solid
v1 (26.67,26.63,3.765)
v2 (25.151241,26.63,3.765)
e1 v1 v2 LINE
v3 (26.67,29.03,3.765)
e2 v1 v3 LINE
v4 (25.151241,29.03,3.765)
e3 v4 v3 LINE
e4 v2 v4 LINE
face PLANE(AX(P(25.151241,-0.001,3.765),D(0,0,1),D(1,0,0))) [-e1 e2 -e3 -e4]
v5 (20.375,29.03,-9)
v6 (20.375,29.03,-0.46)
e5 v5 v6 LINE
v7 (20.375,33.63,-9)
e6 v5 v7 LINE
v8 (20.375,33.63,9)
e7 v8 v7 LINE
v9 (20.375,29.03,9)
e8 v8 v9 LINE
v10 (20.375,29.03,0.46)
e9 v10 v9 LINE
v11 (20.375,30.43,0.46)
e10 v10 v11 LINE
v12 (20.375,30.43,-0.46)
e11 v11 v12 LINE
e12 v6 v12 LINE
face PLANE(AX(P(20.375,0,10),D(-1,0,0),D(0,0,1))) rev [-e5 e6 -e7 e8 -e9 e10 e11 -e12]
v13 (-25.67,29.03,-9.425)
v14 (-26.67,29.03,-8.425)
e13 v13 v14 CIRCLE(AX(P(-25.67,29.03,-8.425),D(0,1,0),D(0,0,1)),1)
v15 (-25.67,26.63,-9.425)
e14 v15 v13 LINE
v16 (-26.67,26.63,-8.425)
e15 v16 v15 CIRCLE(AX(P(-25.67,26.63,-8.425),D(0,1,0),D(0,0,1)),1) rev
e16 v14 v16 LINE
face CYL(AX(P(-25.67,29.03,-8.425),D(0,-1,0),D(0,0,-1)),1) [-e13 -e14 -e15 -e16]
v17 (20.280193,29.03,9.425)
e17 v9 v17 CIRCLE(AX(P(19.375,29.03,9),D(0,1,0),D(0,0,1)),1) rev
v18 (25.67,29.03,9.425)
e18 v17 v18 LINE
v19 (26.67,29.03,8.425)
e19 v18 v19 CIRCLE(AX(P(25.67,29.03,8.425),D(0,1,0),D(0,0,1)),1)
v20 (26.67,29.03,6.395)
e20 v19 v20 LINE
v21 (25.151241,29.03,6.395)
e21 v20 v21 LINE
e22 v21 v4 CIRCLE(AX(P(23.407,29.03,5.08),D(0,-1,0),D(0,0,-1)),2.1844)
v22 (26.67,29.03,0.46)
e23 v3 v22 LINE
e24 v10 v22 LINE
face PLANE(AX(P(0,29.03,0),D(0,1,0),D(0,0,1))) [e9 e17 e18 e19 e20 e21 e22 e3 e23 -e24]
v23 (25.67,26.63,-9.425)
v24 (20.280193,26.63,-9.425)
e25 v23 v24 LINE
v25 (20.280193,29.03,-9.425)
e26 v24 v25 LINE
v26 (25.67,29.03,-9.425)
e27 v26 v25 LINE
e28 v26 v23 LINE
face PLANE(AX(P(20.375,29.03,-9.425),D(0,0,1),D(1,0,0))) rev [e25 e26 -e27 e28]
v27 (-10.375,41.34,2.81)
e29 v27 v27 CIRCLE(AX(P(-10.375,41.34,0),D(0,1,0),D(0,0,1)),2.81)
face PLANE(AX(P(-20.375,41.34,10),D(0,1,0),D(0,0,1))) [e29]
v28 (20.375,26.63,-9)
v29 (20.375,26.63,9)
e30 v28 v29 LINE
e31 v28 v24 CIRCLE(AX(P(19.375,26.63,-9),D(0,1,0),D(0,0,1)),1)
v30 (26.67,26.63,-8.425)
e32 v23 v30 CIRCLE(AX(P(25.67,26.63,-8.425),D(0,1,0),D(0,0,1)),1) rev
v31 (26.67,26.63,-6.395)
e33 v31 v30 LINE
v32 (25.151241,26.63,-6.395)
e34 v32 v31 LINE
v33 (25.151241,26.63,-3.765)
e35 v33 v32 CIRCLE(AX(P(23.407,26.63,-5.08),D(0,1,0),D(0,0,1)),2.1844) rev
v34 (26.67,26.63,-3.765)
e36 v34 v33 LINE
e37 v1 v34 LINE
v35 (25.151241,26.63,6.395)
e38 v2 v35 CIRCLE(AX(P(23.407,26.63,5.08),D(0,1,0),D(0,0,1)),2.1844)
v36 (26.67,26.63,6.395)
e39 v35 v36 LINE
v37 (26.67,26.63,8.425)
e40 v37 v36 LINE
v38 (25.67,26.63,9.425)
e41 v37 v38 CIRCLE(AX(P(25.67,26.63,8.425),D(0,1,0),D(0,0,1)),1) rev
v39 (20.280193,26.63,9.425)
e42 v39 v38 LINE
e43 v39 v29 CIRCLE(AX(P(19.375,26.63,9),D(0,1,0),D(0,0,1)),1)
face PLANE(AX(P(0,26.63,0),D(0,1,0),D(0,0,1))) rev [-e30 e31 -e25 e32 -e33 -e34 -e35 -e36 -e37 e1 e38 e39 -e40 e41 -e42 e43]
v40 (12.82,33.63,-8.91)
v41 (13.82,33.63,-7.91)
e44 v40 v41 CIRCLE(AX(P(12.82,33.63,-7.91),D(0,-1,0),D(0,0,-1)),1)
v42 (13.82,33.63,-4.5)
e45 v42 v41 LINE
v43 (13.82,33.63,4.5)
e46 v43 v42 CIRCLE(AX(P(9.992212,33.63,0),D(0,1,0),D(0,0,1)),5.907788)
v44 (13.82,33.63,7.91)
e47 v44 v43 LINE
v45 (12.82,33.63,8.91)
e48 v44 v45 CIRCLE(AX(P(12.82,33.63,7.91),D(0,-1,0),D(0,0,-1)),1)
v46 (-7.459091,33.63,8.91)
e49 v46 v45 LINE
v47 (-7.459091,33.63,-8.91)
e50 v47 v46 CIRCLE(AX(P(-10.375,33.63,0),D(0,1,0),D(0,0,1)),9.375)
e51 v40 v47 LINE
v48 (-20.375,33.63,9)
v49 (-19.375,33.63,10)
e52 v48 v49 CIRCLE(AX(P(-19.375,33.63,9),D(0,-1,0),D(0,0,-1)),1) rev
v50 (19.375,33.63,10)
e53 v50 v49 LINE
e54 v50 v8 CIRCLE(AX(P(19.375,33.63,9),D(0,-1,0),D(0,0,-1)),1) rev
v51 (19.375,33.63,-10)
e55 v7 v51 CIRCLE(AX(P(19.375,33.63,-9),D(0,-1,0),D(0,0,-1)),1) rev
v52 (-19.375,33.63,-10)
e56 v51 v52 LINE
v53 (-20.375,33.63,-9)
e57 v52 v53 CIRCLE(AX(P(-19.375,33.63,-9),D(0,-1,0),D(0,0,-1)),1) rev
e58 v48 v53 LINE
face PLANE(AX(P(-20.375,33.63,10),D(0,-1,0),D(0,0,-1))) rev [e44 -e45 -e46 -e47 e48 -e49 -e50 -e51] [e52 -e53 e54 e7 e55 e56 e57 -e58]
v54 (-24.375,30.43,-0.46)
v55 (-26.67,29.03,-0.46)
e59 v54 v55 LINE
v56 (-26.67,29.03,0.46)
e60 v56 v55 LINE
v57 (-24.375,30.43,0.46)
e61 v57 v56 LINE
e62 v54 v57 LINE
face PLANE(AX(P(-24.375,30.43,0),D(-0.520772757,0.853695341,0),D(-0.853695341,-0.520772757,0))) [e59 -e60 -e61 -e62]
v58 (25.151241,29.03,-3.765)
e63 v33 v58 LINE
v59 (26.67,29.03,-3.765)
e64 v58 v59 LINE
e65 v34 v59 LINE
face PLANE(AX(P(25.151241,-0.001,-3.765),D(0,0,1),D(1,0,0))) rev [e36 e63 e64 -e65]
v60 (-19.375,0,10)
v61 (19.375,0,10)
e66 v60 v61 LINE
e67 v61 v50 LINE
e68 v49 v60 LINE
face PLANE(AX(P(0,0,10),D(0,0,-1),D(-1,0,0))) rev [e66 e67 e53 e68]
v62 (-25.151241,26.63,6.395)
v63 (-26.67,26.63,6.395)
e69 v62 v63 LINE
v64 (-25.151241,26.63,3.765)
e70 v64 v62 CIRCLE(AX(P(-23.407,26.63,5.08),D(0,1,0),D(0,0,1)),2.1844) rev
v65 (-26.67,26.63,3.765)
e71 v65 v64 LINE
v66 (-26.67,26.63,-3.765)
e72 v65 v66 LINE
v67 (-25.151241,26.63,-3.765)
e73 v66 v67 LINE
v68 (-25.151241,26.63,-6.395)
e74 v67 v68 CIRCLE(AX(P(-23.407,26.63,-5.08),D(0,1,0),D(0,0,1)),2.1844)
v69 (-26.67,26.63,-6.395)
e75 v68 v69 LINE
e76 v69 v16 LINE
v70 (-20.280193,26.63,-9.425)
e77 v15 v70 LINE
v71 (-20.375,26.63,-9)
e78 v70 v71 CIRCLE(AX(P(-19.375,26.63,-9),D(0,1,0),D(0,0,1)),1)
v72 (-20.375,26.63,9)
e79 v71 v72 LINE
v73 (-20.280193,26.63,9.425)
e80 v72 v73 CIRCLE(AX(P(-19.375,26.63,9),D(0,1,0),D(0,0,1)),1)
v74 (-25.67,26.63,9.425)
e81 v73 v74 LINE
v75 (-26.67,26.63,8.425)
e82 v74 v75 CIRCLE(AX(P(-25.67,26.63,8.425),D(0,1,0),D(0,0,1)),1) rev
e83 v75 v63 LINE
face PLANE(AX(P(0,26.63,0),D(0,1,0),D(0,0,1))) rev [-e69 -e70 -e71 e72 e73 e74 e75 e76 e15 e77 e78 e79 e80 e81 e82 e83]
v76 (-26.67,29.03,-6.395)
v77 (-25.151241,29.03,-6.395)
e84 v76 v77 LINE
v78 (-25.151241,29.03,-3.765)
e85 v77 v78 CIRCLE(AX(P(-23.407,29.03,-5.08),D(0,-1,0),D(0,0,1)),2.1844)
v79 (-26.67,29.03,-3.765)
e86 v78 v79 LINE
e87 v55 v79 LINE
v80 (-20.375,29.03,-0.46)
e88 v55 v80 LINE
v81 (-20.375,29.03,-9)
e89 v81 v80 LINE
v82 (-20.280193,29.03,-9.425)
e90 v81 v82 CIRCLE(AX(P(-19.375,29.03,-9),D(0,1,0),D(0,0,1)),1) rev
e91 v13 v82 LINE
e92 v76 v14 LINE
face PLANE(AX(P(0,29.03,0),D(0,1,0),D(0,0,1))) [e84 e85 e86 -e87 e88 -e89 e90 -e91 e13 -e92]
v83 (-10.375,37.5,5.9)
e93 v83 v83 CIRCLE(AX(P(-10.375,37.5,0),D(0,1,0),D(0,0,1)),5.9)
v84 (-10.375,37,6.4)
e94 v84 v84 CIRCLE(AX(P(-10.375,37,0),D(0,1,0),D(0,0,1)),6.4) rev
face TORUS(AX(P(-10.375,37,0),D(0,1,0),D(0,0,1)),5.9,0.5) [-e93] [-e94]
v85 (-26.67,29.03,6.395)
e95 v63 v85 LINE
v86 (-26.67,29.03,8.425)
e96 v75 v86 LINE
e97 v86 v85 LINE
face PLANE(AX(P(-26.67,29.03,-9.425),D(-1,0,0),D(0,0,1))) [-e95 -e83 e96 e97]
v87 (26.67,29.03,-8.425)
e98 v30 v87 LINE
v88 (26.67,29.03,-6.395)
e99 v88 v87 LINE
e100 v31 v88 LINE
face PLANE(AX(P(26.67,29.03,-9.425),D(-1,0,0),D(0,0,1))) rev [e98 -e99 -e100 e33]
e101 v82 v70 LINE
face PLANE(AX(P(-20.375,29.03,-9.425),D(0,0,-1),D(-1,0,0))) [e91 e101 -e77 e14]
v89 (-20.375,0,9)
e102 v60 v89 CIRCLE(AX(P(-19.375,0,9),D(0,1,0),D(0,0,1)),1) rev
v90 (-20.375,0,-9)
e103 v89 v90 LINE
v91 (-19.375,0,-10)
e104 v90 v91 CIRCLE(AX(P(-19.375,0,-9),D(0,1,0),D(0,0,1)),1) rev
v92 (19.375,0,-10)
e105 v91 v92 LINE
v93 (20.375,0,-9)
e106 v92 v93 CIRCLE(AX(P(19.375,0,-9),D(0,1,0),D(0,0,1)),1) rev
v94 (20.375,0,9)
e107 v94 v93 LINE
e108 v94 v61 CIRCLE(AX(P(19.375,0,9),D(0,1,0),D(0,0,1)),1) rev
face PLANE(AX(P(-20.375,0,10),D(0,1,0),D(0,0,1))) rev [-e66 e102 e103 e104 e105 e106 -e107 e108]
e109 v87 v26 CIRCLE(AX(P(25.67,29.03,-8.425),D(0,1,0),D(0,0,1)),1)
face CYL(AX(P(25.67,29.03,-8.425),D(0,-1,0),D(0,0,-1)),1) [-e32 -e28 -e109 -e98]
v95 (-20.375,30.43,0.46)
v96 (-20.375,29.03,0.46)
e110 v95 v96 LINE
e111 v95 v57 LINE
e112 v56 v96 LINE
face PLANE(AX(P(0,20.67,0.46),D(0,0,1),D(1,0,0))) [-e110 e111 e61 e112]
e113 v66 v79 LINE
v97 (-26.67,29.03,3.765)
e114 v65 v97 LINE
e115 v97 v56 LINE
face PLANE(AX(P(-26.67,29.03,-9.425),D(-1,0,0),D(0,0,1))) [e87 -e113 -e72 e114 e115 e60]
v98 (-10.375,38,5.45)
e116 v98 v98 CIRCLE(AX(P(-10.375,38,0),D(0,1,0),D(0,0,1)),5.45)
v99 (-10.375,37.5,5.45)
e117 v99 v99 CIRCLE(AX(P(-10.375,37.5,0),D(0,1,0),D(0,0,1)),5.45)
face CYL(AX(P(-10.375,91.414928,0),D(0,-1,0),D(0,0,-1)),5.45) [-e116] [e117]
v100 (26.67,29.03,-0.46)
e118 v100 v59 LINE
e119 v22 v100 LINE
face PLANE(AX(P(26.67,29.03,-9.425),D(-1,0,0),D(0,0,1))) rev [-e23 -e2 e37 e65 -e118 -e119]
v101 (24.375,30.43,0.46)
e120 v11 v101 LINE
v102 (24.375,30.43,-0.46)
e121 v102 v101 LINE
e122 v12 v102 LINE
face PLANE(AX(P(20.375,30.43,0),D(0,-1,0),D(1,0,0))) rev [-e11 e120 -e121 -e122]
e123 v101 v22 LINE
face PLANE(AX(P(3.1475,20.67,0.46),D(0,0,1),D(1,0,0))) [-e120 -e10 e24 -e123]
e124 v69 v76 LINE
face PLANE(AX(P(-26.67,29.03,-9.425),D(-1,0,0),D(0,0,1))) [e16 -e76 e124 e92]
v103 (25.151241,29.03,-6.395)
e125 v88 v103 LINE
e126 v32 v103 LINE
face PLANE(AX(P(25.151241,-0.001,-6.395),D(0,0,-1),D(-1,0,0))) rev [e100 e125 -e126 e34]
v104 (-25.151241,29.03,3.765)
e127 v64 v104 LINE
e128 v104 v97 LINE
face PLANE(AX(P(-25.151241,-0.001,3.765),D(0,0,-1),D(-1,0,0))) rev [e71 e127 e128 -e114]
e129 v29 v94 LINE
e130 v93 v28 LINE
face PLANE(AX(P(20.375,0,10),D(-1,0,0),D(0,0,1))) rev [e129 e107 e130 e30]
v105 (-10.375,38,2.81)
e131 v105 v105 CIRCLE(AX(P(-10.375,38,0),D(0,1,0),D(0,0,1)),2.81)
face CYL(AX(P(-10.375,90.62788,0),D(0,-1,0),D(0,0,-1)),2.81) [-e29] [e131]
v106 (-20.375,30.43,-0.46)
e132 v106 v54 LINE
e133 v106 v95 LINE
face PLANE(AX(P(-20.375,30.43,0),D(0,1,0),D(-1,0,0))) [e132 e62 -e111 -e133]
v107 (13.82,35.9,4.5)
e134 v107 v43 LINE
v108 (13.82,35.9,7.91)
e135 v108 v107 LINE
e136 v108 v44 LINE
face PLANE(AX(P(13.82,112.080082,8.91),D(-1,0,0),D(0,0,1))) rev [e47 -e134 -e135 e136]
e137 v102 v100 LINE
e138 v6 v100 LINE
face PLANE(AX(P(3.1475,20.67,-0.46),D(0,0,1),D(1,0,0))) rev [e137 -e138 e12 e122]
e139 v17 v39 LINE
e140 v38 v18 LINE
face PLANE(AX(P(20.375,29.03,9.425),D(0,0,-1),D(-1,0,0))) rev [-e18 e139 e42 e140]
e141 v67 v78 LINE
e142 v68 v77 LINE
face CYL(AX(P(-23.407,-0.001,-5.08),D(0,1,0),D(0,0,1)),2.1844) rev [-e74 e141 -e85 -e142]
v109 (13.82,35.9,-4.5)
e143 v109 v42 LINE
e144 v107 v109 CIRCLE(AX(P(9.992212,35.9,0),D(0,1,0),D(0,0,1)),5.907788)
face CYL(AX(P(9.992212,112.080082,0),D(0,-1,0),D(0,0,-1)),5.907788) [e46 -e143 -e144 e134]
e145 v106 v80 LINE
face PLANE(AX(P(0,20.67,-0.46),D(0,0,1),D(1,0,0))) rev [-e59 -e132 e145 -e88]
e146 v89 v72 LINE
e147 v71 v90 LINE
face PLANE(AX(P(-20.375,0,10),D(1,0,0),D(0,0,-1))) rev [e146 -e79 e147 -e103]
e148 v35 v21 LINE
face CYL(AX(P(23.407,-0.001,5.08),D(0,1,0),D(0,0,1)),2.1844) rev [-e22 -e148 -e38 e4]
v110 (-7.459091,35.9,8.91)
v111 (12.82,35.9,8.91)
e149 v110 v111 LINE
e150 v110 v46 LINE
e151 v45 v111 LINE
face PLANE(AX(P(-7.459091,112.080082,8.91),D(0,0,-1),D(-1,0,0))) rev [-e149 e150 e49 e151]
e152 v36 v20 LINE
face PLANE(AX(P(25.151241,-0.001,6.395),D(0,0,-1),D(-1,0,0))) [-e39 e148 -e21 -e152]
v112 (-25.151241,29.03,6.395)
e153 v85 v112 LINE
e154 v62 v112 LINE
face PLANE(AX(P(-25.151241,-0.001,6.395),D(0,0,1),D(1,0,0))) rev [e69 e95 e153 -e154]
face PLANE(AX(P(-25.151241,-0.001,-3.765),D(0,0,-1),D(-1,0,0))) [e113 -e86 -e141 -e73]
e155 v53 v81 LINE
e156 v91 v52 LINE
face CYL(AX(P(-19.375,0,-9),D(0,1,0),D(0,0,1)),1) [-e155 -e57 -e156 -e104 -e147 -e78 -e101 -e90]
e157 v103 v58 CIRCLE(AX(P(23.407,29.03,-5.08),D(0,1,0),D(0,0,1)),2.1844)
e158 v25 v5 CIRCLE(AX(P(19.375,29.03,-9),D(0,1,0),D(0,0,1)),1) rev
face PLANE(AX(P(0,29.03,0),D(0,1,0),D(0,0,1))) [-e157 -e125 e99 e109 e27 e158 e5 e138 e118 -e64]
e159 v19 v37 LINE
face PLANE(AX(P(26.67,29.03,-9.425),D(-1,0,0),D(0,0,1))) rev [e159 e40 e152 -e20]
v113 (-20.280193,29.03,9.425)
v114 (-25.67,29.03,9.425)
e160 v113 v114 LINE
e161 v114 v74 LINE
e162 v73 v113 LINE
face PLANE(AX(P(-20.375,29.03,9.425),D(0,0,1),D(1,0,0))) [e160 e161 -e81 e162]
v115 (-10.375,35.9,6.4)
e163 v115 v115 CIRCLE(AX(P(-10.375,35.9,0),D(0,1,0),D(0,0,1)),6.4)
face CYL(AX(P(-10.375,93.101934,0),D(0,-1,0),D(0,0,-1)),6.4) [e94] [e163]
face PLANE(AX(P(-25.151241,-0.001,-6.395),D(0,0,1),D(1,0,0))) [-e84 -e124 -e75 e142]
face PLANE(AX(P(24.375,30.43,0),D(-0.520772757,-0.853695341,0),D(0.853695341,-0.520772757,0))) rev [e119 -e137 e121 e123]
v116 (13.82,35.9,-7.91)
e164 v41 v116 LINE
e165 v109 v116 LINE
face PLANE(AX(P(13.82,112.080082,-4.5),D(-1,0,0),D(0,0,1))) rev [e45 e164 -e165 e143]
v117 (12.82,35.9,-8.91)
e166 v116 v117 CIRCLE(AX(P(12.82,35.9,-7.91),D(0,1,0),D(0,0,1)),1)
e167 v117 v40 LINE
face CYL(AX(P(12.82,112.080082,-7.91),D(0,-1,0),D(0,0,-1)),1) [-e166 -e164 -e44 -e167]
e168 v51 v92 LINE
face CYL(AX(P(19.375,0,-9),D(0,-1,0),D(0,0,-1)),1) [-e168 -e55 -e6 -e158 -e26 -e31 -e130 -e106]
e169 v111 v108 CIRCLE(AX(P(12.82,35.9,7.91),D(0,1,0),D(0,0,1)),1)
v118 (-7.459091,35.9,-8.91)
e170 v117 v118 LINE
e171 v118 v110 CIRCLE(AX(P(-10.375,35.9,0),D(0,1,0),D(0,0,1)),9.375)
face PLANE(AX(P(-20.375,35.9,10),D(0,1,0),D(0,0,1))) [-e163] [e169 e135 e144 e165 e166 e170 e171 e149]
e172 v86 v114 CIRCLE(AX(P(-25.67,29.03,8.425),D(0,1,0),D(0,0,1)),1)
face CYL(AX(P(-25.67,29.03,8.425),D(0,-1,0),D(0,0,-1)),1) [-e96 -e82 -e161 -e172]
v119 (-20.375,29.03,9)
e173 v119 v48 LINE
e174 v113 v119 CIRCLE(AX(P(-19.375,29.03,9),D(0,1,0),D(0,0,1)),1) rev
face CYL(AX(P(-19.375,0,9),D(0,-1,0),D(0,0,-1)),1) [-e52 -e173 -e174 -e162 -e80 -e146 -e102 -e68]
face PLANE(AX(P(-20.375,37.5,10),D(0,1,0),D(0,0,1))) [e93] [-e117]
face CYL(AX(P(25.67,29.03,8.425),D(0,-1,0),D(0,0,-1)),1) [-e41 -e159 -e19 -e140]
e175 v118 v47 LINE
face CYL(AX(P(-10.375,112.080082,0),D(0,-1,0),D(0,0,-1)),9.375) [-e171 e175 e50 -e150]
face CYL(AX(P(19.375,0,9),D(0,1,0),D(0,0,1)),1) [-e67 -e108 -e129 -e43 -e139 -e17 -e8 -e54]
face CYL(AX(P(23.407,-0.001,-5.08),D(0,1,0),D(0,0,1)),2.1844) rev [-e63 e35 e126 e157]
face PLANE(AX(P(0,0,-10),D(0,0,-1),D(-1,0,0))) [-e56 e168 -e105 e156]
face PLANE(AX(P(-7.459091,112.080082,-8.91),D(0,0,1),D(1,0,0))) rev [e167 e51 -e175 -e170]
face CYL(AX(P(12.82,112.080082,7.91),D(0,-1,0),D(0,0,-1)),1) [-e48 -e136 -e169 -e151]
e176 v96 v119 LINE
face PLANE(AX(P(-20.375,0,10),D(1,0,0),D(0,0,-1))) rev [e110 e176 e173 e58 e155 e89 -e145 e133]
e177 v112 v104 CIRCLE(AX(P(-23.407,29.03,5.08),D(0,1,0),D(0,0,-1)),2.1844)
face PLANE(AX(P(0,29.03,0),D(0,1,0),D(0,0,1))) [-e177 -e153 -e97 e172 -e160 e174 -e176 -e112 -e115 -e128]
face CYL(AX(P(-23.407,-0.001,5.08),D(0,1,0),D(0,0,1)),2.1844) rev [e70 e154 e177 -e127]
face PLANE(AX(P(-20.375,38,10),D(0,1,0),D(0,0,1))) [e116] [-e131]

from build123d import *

# Parameters (mm, degrees)
SKETCH1_W            = 40.75
SKETCH1_H            = 33.63
BOSS_EXTRUDE1_DEPTH  = 10
BOSS_EXTRUDE2_DEPTH  = 2.27
SKETCH3_R            = 6.4
BOSS_EXTRUDE3_DEPTH  = 1.6
SKETCH4_R            = 5.45
BOSS_EXTRUDE4_DEPTH  = 0.5
SKETCH5_R            = 2.81
BOSS_EXTRUDE5_DEPTH  = 3.34
BOSS_EXTRUDE6_START  = -7
SKETCH6_W            = 6.295
SKETCH6_H            = 18.85
BOSS_EXTRUDE6_DEPTH  = 2.4
RIB1_START           = -0.46
RIB1_DEPTH           = 0.92
CUT_EXTRUDE2_REACH   = 42.67
MIRROR1_COPY_1_REACH = 42.67
FILLET2_R            = 1
FILLET3_R            = 0.5


# Read off the part's stored shape, not the designer's step: Rib1
with BuildPart() as part:
    # Sketch1 → Boss-Extrude1 (new, symmetric)
    with BuildSketch(Plane.XY):
        with Locations((0, 16.815)):
            Rectangle(SKETCH1_W, SKETCH1_H)
    extrude(amount=BOSS_EXTRUDE1_DEPTH, both=True)

    # Sketch2 → Boss-Extrude2 (add)
    with BuildSketch(Plane(origin=(0, 33.63, 0), x_dir=(1, 0, 0), z_dir=(0, 1, 0))):
        with BuildLine():
            Line((-7.459091051, -8.91), (13.82, -8.91))
            Line((13.82, -8.91), (13.82, -4.5))
            ThreePointArc((13.82, -4.5), (15.9, 0), (13.82, 4.5))
            Line((13.82, 4.5), (13.82, 8.91))
            Line((13.82, 8.91), (-7.459091051, 8.91))
            ThreePointArc((-7.459091051, 8.91), (-19.75, 0), (-7.459091051, -8.91))
        make_face()
    extrude(amount=BOSS_EXTRUDE2_DEPTH)

    # Sketch3 → Boss-Extrude3 (add)
    with BuildSketch(Plane(origin=(0, 35.9, 0), x_dir=(1, 0, 0), z_dir=(0, 1, 0))):
        with Locations(Location((-10.375, 0, 0), (0, 0, 270))):
            Circle(SKETCH3_R)
    extrude(amount=BOSS_EXTRUDE3_DEPTH)

    # Sketch4 → Boss-Extrude4 (add)
    with BuildSketch(Plane(origin=(0, 37.5, 0), x_dir=(1, 0, 0), z_dir=(0, 1, 0))):
        with Locations(Location((-10.375, 0, 0), (0, 0, 270))):
            Circle(SKETCH4_R)
    extrude(amount=BOSS_EXTRUDE4_DEPTH)

    # Sketch5 → Boss-Extrude5 (add)
    with BuildSketch(Plane(origin=(0, 38, 0), x_dir=(1, 0, 0), z_dir=(0, 1, 0))):
        with Locations(Location((-10.375, 0, 0), (0, 0, 270))):
            Circle(SKETCH5_R)
    extrude(amount=BOSS_EXTRUDE5_DEPTH)

    # Sketch6 → Boss-Extrude6 (add)
    with BuildSketch(Plane(origin=(0, 33.63, 0), x_dir=(1, 0, 0), z_dir=(0, 1, 0)).offset(BOSS_EXTRUDE6_START)):
        with Locations((23.5225, 0)):
            Rectangle(SKETCH6_W, SKETCH6_H)
    boss_extrude6 = extrude(amount=BOSS_EXTRUDE6_DEPTH)

    # Rib1 outline → Rib1 (add)
    with BuildSketch(Plane.XY.offset(RIB1_START)):
        Polygon((24.375, 30.43), (20.375, 30.43), (20.375, 29.03), (26.67, 29.03), align=None)
    rib1 = extrude(amount=RIB1_DEPTH)

    # Sketch10 → Cut-Extrude2 (cut, up to next)
    with BuildSketch(Plane(origin=(0, 29.03, 0), x_dir=(1, 0, 0), z_dir=(0, 1, 0)), mode=Mode.PRIVATE) as cut_extrude2_sk1:
        with BuildLine():
            Line((25.151241486, 6.395), (26.67, 6.395))
            Line((26.67, 6.395), (26.67, 3.765))
            Line((26.67, 3.765), (25.151241486, 3.765))
            ThreePointArc((25.151241486, 3.765), (21.2226, 5.08), (25.151241486, 6.395))
        make_face()
    cut_extrude2_tool1 = extrude(cut_extrude2_sk1.sketch, amount=-CUT_EXTRUDE2_REACH, mode=Mode.PRIVATE) & part.part
    cut_extrude2 = cut_extrude2_tool1.solids().sort_by_distance((23.873275, 29.03, -5.08))[0]
    add(cut_extrude2, mode=Mode.SUBTRACT)

    # Mirror2: Cut-Extrude2 across plane
    add(cut_extrude2.mirror(Plane.XY), mode=Mode.SUBTRACT)

    # Mirror1: Boss-Extrude6, Rib1, Cut-Extrude2 across plane
    add(boss_extrude6.mirror(Plane(origin=(0, 0, 0), x_dir=(0, 0, 1), z_dir=(1, 0, 0))))
    add(rib1.mirror(Plane(origin=(0, 0, 0), x_dir=(0, 0, 1), z_dir=(1, 0, 0))))
    add(cut_extrude2.mirror(Plane(origin=(0, 0, 0), x_dir=(0, 0, 1), z_dir=(1, 0, 0))), mode=Mode.SUBTRACT)

    # Mirror1 copy 1 sketch → Mirror1 copy 1 (cut, up to next)
    with BuildSketch(Plane(origin=(0, 29.03, 0), x_dir=(-1, 0, 0), z_dir=(0, 1, 0)), mode=Mode.PRIVATE) as mirror1_copy_1_sk1:
        with BuildLine():
            Line((25.151241486, 6.395), (26.67, 6.395))
            Line((26.67, 6.395), (26.67, 3.765))
            Line((26.67, 3.765), (25.151241486, 3.765))
            ThreePointArc((25.151241486, 3.765), (21.2226, 5.08), (25.151241486, 6.395))
        make_face()
    mirror1_copy_1_tool1 = extrude(mirror1_copy_1_sk1.sketch, amount=-MIRROR1_COPY_1_REACH, mode=Mode.PRIVATE) & part.part
    add(mirror1_copy_1_tool1.solids().sort_by_distance((-23.873275, 29.03, 5.08))[0], mode=Mode.SUBTRACT)

    # Fillet2
    # the kernel refuses this fillet: 1 mm, written as the material it takes off along each edge
    with BuildSketch(Plane(origin=(13.82, 33.63, -8.91), x_dir=(0, 0, 1), z_dir=(0, 1, 0)), Plane(origin=(13.82, 33.63, 8.91), x_dir=(-1, 0, 0), z_dir=(0, 1, 0))) as fillet2_piece_1:
        with BuildLine():
            CenterArc((FILLET2_R, -FILLET2_R), FILLET2_R, 90, 90)
            Line((0, -FILLET2_R), (0, 0))
            Line((0, 0), (FILLET2_R, 0))
        make_face()
    extrude(amount=4.77, mode=Mode.SUBTRACT)
    with BuildSketch(Plane(origin=(26.67, 24.13, 9.425), x_dir=(-1, 0, 0), z_dir=(0, 1, 0)), Plane(origin=(-26.67, 24.13, -9.425), x_dir=(1, 0, 0), z_dir=(0, 1, 0))) as fillet2_piece_2:
        with BuildLine():
            CenterArc((FILLET2_R, -FILLET2_R), FILLET2_R, 90, 90)
            Line((0, -FILLET2_R), (0, 0))
            Line((0, 0), (FILLET2_R, 0))
        make_face()
    extrude(amount=7.4, mode=Mode.SUBTRACT)
    with BuildSketch(Plane(origin=(26.67, 24.13, -9.425), x_dir=(-1, 0, 0), z_dir=(0, 1, 0)), Plane(origin=(-26.67, 24.13, 9.425), x_dir=(1, 0, 0), z_dir=(0, 1, 0))) as fillet2_piece_3:
        with BuildLine():
            CenterArc((FILLET2_R, FILLET2_R), FILLET2_R, 180, 90)
            Line((0, FILLET2_R), (0, 0))
            Line((0, 0), (FILLET2_R, 0))
        make_face()
    extrude(amount=7.4, mode=Mode.SUBTRACT)
    with BuildSketch(Plane(origin=(-20.375, 36.13, -10), x_dir=(1, 0, 0), z_dir=(0, -1, 0))) as fillet2_piece_4_section:
        with BuildLine():
            CenterArc((FILLET2_R, FILLET2_R), FILLET2_R, 180, 90)
            Line((0, FILLET2_R), (0, 0))
            Line((0, 0), (FILLET2_R, 0))
        make_face()
    fillet2_piece_4 = extrude(amount=38.63, mode=Mode.PRIVATE)
    fillet2_piece_4 = split(fillet2_piece_4, bisect_by=Plane(origin=(-20.12881047, 29.03, -9.819650702), z_dir=(0, 1, 0)), keep=Keep.TOP, mode=Mode.PRIVATE)
    fillet2_piece_4 = split(fillet2_piece_4, bisect_by=Plane(origin=(-20.12881047, 32.58, -9.425), z_dir=(0, 0, -1)), keep=Keep.TOP, mode=Mode.PRIVATE)
    add(fillet2_piece_4, mode=Mode.SUBTRACT)
    with BuildSketch(Plane(origin=(-20.375, 36.13, -10), x_dir=(1, 0, 0), z_dir=(0, -1, 0))) as fillet2_piece_5_section:
        with BuildLine():
            CenterArc((FILLET2_R, FILLET2_R), FILLET2_R, 180, 90)
            Line((0, FILLET2_R), (0, 0))
            Line((0, 0), (FILLET2_R, 0))
        make_face()
    fillet2_piece_5 = extrude(amount=38.63, mode=Mode.PRIVATE)
    fillet2_piece_5 = split(fillet2_piece_5, bisect_by=Plane(origin=(-20.361790059, 29.03, -9.277693036), z_dir=(0, 1, 0)), keep=Keep.TOP, mode=Mode.PRIVATE)
    fillet2_piece_5 = split(fillet2_piece_5, bisect_by=Plane(origin=(-20.361790059, 32.58, -9.425), z_dir=(0, 0, 1)), keep=Keep.TOP, mode=Mode.PRIVATE)
    add(fillet2_piece_5, mode=Mode.SUBTRACT)
    with BuildSketch(Plane(origin=(-20.375, 36.13, -10), x_dir=(1, 0, 0), z_dir=(0, -1, 0))) as fillet2_piece_6_section:
        with BuildLine():
            CenterArc((FILLET2_R, FILLET2_R), FILLET2_R, 180, 90)
            Line((0, FILLET2_R), (0, 0))
            Line((0, 0), (FILLET2_R, 0))
        make_face()
    fillet2_piece_6 = extrude(amount=38.63, mode=Mode.PRIVATE)
    fillet2_piece_6 = split(fillet2_piece_6, bisect_by=Plane(origin=(-20.12881047, 29.03, -9.819650702), z_dir=(0, -1, 0)), keep=Keep.TOP, mode=Mode.PRIVATE)
    fillet2_piece_6 = split(fillet2_piece_6, bisect_by=Plane(origin=(-20.12881047, 27.83, -9.425), z_dir=(0, 0, -1)), keep=Keep.TOP, mode=Mode.PRIVATE)
    fillet2_piece_6 = split(fillet2_piece_6, bisect_by=Plane(origin=(-20.12881047, 26.63, -9.819650702), z_dir=(0, 1, 0)), keep=Keep.TOP, mode=Mode.PRIVATE)
    add(fillet2_piece_6, mode=Mode.SUBTRACT)
    with BuildSketch(Plane(origin=(-20.375, 36.13, -10), x_dir=(1, 0, 0), z_dir=(0, -1, 0))) as fillet2_piece_7_section:
        with BuildLine():
            CenterArc((FILLET2_R, FILLET2_R), FILLET2_R, 180, 90)
            Line((0, FILLET2_R), (0, 0))
            Line((0, 0), (FILLET2_R, 0))
        make_face()
    fillet2_piece_7 = extrude(amount=38.63, mode=Mode.PRIVATE)
    fillet2_piece_7 = split(fillet2_piece_7, bisect_by=Plane(origin=(-20.12881047, 12.065, -9.425), z_dir=(0, 0, -1)), keep=Keep.TOP, mode=Mode.PRIVATE)
    fillet2_piece_7 = split(fillet2_piece_7, bisect_by=Plane(origin=(-20.12881047, 26.63, -9.819650702), z_dir=(0, -1, 0)), keep=Keep.TOP, mode=Mode.PRIVATE)
    add(fillet2_piece_7, mode=Mode.SUBTRACT)
    with BuildSketch(Plane(origin=(-20.375, 36.13, -10), x_dir=(1, 0, 0), z_dir=(0, -1, 0))) as fillet2_piece_8_section:
        with BuildLine():
            CenterArc((FILLET2_R, FILLET2_R), FILLET2_R, 180, 90)
            Line((0, FILLET2_R), (0, 0))
            Line((0, 0), (FILLET2_R, 0))
        make_face()
    fillet2_piece_8 = extrude(amount=38.63, mode=Mode.PRIVATE)
    fillet2_piece_8 = split(fillet2_piece_8, bisect_by=Plane(origin=(-20.361790059, 12.065, -9.425), z_dir=(0, 0, 1)), keep=Keep.TOP, mode=Mode.PRIVATE)
    fillet2_piece_8 = split(fillet2_piece_8, bisect_by=Plane(origin=(-20.361790059, 26.63, -9.277693036), z_dir=(0, -1, 0)), keep=Keep.TOP, mode=Mode.PRIVATE)
    add(fillet2_piece_8, mode=Mode.SUBTRACT)
    with BuildSketch(Plane(origin=(20.375, -2.5, -10), x_dir=(-1, 0, 0), z_dir=(0, 1, 0))) as fillet2_piece_9_section:
        with BuildLine():
            CenterArc((FILLET2_R, FILLET2_R), FILLET2_R, 180, 90)
            Line((0, FILLET2_R), (0, 0))
            Line((0, 0), (FILLET2_R, 0))
        make_face()
    fillet2_piece_9 = extrude(amount=38.63, mode=Mode.PRIVATE)
    fillet2_piece_9 = split(fillet2_piece_9, bisect_by=Plane(origin=(20.12881047, 12.065, -9.425), z_dir=(0, 0, -1)), keep=Keep.TOP, mode=Mode.PRIVATE)
    fillet2_piece_9 = split(fillet2_piece_9, bisect_by=Plane(origin=(20.12881047, 26.63, -9.819650702), z_dir=(0, -1, 0)), keep=Keep.TOP, mode=Mode.PRIVATE)
    add(fillet2_piece_9, mode=Mode.SUBTRACT)
    with BuildSketch(Plane(origin=(20.375, -2.5, -10), x_dir=(-1, 0, 0), z_dir=(0, 1, 0))) as fillet2_piece_10_section:
        with BuildLine():
            CenterArc((FILLET2_R, FILLET2_R), FILLET2_R, 180, 90)
            Line((0, FILLET2_R), (0, 0))
            Line((0, 0), (FILLET2_R, 0))
        make_face()
    fillet2_piece_10 = extrude(amount=38.63, mode=Mode.PRIVATE)
    fillet2_piece_10 = split(fillet2_piece_10, bisect_by=Plane(origin=(20.361790059, 12.065, -9.425), z_dir=(0, 0, 1)), keep=Keep.TOP, mode=Mode.PRIVATE)
    fillet2_piece_10 = split(fillet2_piece_10, bisect_by=Plane(origin=(20.361790059, 26.63, -9.277693036), z_dir=(0, -1, 0)), keep=Keep.TOP, mode=Mode.PRIVATE)
    add(fillet2_piece_10, mode=Mode.SUBTRACT)
    with BuildSketch(Plane(origin=(20.375, -2.5, -10), x_dir=(-1, 0, 0), z_dir=(0, 1, 0))) as fillet2_piece_11_section:
        with BuildLine():
            CenterArc((FILLET2_R, FILLET2_R), FILLET2_R, 180, 90)
            Line((0, FILLET2_R), (0, 0))
            Line((0, 0), (FILLET2_R, 0))
        make_face()
    fillet2_piece_11 = extrude(amount=38.63, mode=Mode.PRIVATE)
    fillet2_piece_11 = split(fillet2_piece_11, bisect_by=Plane(origin=(20.12881047, 27.83, -9.425), z_dir=(0, 0, -1)), keep=Keep.TOP, mode=Mode.PRIVATE)
    fillet2_piece_11 = split(fillet2_piece_11, bisect_by=Plane(origin=(20.12881047, 29.03, -9.819650702), z_dir=(0, -1, 0)), keep=Keep.TOP, mode=Mode.PRIVATE)
    fillet2_piece_11 = split(fillet2_piece_11, bisect_by=Plane(origin=(20.12881047, 26.63, -9.819650702), z_dir=(0, 1, 0)), keep=Keep.TOP, mode=Mode.PRIVATE)
    add(fillet2_piece_11, mode=Mode.SUBTRACT)
    with BuildSketch(Plane(origin=(20.375, -2.5, -10), x_dir=(-1, 0, 0), z_dir=(0, 1, 0))) as fillet2_piece_12_section:
        with BuildLine():
            CenterArc((FILLET2_R, FILLET2_R), FILLET2_R, 180, 90)
            Line((0, FILLET2_R), (0, 0))
            Line((0, 0), (FILLET2_R, 0))
        make_face()
    fillet2_piece_12 = extrude(amount=38.63, mode=Mode.PRIVATE)
    fillet2_piece_12 = split(fillet2_piece_12, bisect_by=Plane(origin=(20.12881047, 32.58, -9.425), z_dir=(0, 0, -1)), keep=Keep.TOP, mode=Mode.PRIVATE)
    fillet2_piece_12 = split(fillet2_piece_12, bisect_by=Plane(origin=(20.12881047, 29.03, -9.819650702), z_dir=(0, 1, 0)), keep=Keep.TOP, mode=Mode.PRIVATE)
    add(fillet2_piece_12, mode=Mode.SUBTRACT)
    with BuildSketch(Plane(origin=(20.375, -2.5, -10), x_dir=(-1, 0, 0), z_dir=(0, 1, 0))) as fillet2_piece_13_section:
        with BuildLine():
            CenterArc((FILLET2_R, FILLET2_R), FILLET2_R, 180, 90)
            Line((0, FILLET2_R), (0, 0))
            Line((0, 0), (FILLET2_R, 0))
        make_face()
    fillet2_piece_13 = extrude(amount=38.63, mode=Mode.PRIVATE)
    fillet2_piece_13 = split(fillet2_piece_13, bisect_by=Plane(origin=(20.361790059, 32.58, -9.425), z_dir=(0, 0, 1)), keep=Keep.TOP, mode=Mode.PRIVATE)
    fillet2_piece_13 = split(fillet2_piece_13, bisect_by=Plane(origin=(20.361790059, 29.03, -9.277693036), z_dir=(0, 1, 0)), keep=Keep.TOP, mode=Mode.PRIVATE)
    add(fillet2_piece_13, mode=Mode.SUBTRACT)
    with BuildSketch(Plane(origin=(20.375, -2.5, 10), x_dir=(0, 0, -1), z_dir=(0, 1, 0))) as fillet2_piece_14_section:
        with BuildLine():
            CenterArc((FILLET2_R, FILLET2_R), FILLET2_R, 180, 90)
            Line((0, FILLET2_R), (0, 0))
            Line((0, 0), (FILLET2_R, 0))
        make_face()
    fillet2_piece_14 = extrude(amount=38.63, mode=Mode.PRIVATE)
    fillet2_piece_14 = split(fillet2_piece_14, bisect_by=Plane(origin=(20.361790059, 12.065, 9.425), z_dir=(0, 0, -1)), keep=Keep.TOP, mode=Mode.PRIVATE)
    fillet2_piece_14 = split(fillet2_piece_14, bisect_by=Plane(origin=(20.361790059, 26.63, 9.277693036), z_dir=(0, -1, 0)), keep=Keep.TOP, mode=Mode.PRIVATE)
    add(fillet2_piece_14, mode=Mode.SUBTRACT)
    with BuildSketch(Plane(origin=(20.375, -2.5, 10), x_dir=(0, 0, -1), z_dir=(0, 1, 0))) as fillet2_piece_15_section:
        with BuildLine():
            CenterArc((FILLET2_R, FILLET2_R), FILLET2_R, 180, 90)
            Line((0, FILLET2_R), (0, 0))
            Line((0, 0), (FILLET2_R, 0))
        make_face()
    fillet2_piece_15 = extrude(amount=38.63, mode=Mode.PRIVATE)
    fillet2_piece_15 = split(fillet2_piece_15, bisect_by=Plane(origin=(20.12881047, 12.065, 9.425), z_dir=(0, 0, 1)), keep=Keep.TOP, mode=Mode.PRIVATE)
    fillet2_piece_15 = split(fillet2_piece_15, bisect_by=Plane(origin=(20.12881047, 26.63, 9.819650702), z_dir=(0, -1, 0)), keep=Keep.TOP, mode=Mode.PRIVATE)
    add(fillet2_piece_15, mode=Mode.SUBTRACT)
    with BuildSketch(Plane(origin=(20.375, -2.5, 10), x_dir=(0, 0, -1), z_dir=(0, 1, 0))) as fillet2_piece_16_section:
        with BuildLine():
            CenterArc((FILLET2_R, FILLET2_R), FILLET2_R, 180, 90)
            Line((0, FILLET2_R), (0, 0))
            Line((0, 0), (FILLET2_R, 0))
        make_face()
    fillet2_piece_16 = extrude(amount=38.63, mode=Mode.PRIVATE)
    fillet2_piece_16 = split(fillet2_piece_16, bisect_by=Plane(origin=(20.12881047, 29.03, 9.819650702), z_dir=(0, -1, 0)), keep=Keep.TOP, mode=Mode.PRIVATE)
    fillet2_piece_16 = split(fillet2_piece_16, bisect_by=Plane(origin=(20.12881047, 27.83, 9.425), z_dir=(0, 0, 1)), keep=Keep.TOP, mode=Mode.PRIVATE)
    fillet2_piece_16 = split(fillet2_piece_16, bisect_by=Plane(origin=(20.12881047, 26.63, 9.819650702), z_dir=(0, 1, 0)), keep=Keep.TOP, mode=Mode.PRIVATE)
    add(fillet2_piece_16, mode=Mode.SUBTRACT)
    with BuildSketch(Plane(origin=(20.375, -2.5, 10), x_dir=(0, 0, -1), z_dir=(0, 1, 0))) as fillet2_piece_17_section:
        with BuildLine():
            CenterArc((FILLET2_R, FILLET2_R), FILLET2_R, 180, 90)
            Line((0, FILLET2_R), (0, 0))
            Line((0, 0), (FILLET2_R, 0))
        make_face()
    fillet2_piece_17 = extrude(amount=38.63, mode=Mode.PRIVATE)
    fillet2_piece_17 = split(fillet2_piece_17, bisect_by=Plane(origin=(20.361790059, 29.03, 9.277693036), z_dir=(0, 1, 0)), keep=Keep.TOP, mode=Mode.PRIVATE)
    fillet2_piece_17 = split(fillet2_piece_17, bisect_by=Plane(origin=(20.361790059, 32.58, 9.425), z_dir=(0, 0, -1)), keep=Keep.TOP, mode=Mode.PRIVATE)
    add(fillet2_piece_17, mode=Mode.SUBTRACT)
    with BuildSketch(Plane(origin=(20.375, -2.5, 10), x_dir=(0, 0, -1), z_dir=(0, 1, 0))) as fillet2_piece_18_section:
        with BuildLine():
            CenterArc((FILLET2_R, FILLET2_R), FILLET2_R, 180, 90)
            Line((0, FILLET2_R), (0, 0))
            Line((0, 0), (FILLET2_R, 0))
        make_face()
    fillet2_piece_18 = extrude(amount=38.63, mode=Mode.PRIVATE)
    fillet2_piece_18 = split(fillet2_piece_18, bisect_by=Plane(origin=(20.12881047, 29.03, 9.819650702), z_dir=(0, 1, 0)), keep=Keep.TOP, mode=Mode.PRIVATE)
    fillet2_piece_18 = split(fillet2_piece_18, bisect_by=Plane(origin=(20.12881047, 32.58, 9.425), z_dir=(0, 0, 1)), keep=Keep.TOP, mode=Mode.PRIVATE)
    add(fillet2_piece_18, mode=Mode.SUBTRACT)
    with BuildSketch(Plane(origin=(-20.375, 36.13, 10), x_dir=(1, 0, 0), z_dir=(0, -1, 0))) as fillet2_piece_19_section:
        with BuildLine():
            CenterArc((FILLET2_R, -FILLET2_R), FILLET2_R, 90, 90)
            Line((0, -FILLET2_R), (0, 0))
            Line((0, 0), (FILLET2_R, 0))
        make_face()
    fillet2_piece_19 = extrude(amount=38.63, mode=Mode.PRIVATE)
    fillet2_piece_19 = split(fillet2_piece_19, bisect_by=Plane(origin=(-20.12881047, 32.58, 9.425), z_dir=(0, 0, 1)), keep=Keep.TOP, mode=Mode.PRIVATE)
    fillet2_piece_19 = split(fillet2_piece_19, bisect_by=Plane(origin=(-20.12881047, 29.03, 9.819650702), z_dir=(0, 1, 0)), keep=Keep.TOP, mode=Mode.PRIVATE)
    add(fillet2_piece_19, mode=Mode.SUBTRACT)
    with BuildSketch(Plane(origin=(-20.375, 36.13, 10), x_dir=(1, 0, 0), z_dir=(0, -1, 0))) as fillet2_piece_20_section:
        with BuildLine():
            CenterArc((FILLET2_R, -FILLET2_R), FILLET2_R, 90, 90)
            Line((0, -FILLET2_R), (0, 0))
            Line((0, 0), (FILLET2_R, 0))
        make_face()
    fillet2_piece_20 = extrude(amount=38.63, mode=Mode.PRIVATE)
    fillet2_piece_20 = split(fillet2_piece_20, bisect_by=Plane(origin=(-20.361790059, 32.58, 9.425), z_dir=(0, 0, -1)), keep=Keep.TOP, mode=Mode.PRIVATE)
    fillet2_piece_20 = split(fillet2_piece_20, bisect_by=Plane(origin=(-20.361790059, 29.03, 9.277693036), z_dir=(0, 1, 0)), keep=Keep.TOP, mode=Mode.PRIVATE)
    add(fillet2_piece_20, mode=Mode.SUBTRACT)
    with BuildSketch(Plane(origin=(-20.375, 36.13, 10), x_dir=(1, 0, 0), z_dir=(0, -1, 0))) as fillet2_piece_21_section:
        with BuildLine():
            CenterArc((FILLET2_R, -FILLET2_R), FILLET2_R, 90, 90)
            Line((0, -FILLET2_R), (0, 0))
            Line((0, 0), (FILLET2_R, 0))
        make_face()
    fillet2_piece_21 = extrude(amount=38.63, mode=Mode.PRIVATE)
    fillet2_piece_21 = split(fillet2_piece_21, bisect_by=Plane(origin=(-20.12881047, 27.83, 9.425), z_dir=(0, 0, 1)), keep=Keep.TOP, mode=Mode.PRIVATE)
    fillet2_piece_21 = split(fillet2_piece_21, bisect_by=Plane(origin=(-20.12881047, 29.03, 9.819650702), z_dir=(0, -1, 0)), keep=Keep.TOP, mode=Mode.PRIVATE)
    fillet2_piece_21 = split(fillet2_piece_21, bisect_by=Plane(origin=(-20.12881047, 26.63, 9.819650702), z_dir=(0, 1, 0)), keep=Keep.TOP, mode=Mode.PRIVATE)
    add(fillet2_piece_21, mode=Mode.SUBTRACT)
    with BuildSketch(Plane(origin=(-20.375, 36.13, 10), x_dir=(1, 0, 0), z_dir=(0, -1, 0))) as fillet2_piece_22_section:
        with BuildLine():
            CenterArc((FILLET2_R, -FILLET2_R), FILLET2_R, 90, 90)
            Line((0, -FILLET2_R), (0, 0))
            Line((0, 0), (FILLET2_R, 0))
        make_face()
    fillet2_piece_22 = extrude(amount=38.63, mode=Mode.PRIVATE)
    fillet2_piece_22 = split(fillet2_piece_22, bisect_by=Plane(origin=(-20.12881047, 12.065, 9.425), z_dir=(0, 0, 1)), keep=Keep.TOP, mode=Mode.PRIVATE)
    fillet2_piece_22 = split(fillet2_piece_22, bisect_by=Plane(origin=(-20.12881047, 26.63, 9.819650702), z_dir=(0, -1, 0)), keep=Keep.TOP, mode=Mode.PRIVATE)
    add(fillet2_piece_22, mode=Mode.SUBTRACT)
    with BuildSketch(Plane(origin=(-20.375, 36.13, 10), x_dir=(1, 0, 0), z_dir=(0, -1, 0))) as fillet2_piece_23_section:
        with BuildLine():
            CenterArc((FILLET2_R, -FILLET2_R), FILLET2_R, 90, 90)
            Line((0, -FILLET2_R), (0, 0))
            Line((0, 0), (FILLET2_R, 0))
        make_face()
    fillet2_piece_23 = extrude(amount=38.63, mode=Mode.PRIVATE)
    fillet2_piece_23 = split(fillet2_piece_23, bisect_by=Plane(origin=(-20.361790059, 12.065, 9.425), z_dir=(0, 0, -1)), keep=Keep.TOP, mode=Mode.PRIVATE)
    fillet2_piece_23 = split(fillet2_piece_23, bisect_by=Plane(origin=(-20.361790059, 26.63, 9.277693036), z_dir=(0, -1, 0)), keep=Keep.TOP, mode=Mode.PRIVATE)
    add(fillet2_piece_23, mode=Mode.SUBTRACT)

    # Fillet3
    fillet3_edges = [part.edges().sort_by_distance(p)[0] for p in [
        (-10.375, 37.5, -6.4),
    ]]
    fillet(fillet3_edges, radius=FILLET3_R)


solid = part.part
